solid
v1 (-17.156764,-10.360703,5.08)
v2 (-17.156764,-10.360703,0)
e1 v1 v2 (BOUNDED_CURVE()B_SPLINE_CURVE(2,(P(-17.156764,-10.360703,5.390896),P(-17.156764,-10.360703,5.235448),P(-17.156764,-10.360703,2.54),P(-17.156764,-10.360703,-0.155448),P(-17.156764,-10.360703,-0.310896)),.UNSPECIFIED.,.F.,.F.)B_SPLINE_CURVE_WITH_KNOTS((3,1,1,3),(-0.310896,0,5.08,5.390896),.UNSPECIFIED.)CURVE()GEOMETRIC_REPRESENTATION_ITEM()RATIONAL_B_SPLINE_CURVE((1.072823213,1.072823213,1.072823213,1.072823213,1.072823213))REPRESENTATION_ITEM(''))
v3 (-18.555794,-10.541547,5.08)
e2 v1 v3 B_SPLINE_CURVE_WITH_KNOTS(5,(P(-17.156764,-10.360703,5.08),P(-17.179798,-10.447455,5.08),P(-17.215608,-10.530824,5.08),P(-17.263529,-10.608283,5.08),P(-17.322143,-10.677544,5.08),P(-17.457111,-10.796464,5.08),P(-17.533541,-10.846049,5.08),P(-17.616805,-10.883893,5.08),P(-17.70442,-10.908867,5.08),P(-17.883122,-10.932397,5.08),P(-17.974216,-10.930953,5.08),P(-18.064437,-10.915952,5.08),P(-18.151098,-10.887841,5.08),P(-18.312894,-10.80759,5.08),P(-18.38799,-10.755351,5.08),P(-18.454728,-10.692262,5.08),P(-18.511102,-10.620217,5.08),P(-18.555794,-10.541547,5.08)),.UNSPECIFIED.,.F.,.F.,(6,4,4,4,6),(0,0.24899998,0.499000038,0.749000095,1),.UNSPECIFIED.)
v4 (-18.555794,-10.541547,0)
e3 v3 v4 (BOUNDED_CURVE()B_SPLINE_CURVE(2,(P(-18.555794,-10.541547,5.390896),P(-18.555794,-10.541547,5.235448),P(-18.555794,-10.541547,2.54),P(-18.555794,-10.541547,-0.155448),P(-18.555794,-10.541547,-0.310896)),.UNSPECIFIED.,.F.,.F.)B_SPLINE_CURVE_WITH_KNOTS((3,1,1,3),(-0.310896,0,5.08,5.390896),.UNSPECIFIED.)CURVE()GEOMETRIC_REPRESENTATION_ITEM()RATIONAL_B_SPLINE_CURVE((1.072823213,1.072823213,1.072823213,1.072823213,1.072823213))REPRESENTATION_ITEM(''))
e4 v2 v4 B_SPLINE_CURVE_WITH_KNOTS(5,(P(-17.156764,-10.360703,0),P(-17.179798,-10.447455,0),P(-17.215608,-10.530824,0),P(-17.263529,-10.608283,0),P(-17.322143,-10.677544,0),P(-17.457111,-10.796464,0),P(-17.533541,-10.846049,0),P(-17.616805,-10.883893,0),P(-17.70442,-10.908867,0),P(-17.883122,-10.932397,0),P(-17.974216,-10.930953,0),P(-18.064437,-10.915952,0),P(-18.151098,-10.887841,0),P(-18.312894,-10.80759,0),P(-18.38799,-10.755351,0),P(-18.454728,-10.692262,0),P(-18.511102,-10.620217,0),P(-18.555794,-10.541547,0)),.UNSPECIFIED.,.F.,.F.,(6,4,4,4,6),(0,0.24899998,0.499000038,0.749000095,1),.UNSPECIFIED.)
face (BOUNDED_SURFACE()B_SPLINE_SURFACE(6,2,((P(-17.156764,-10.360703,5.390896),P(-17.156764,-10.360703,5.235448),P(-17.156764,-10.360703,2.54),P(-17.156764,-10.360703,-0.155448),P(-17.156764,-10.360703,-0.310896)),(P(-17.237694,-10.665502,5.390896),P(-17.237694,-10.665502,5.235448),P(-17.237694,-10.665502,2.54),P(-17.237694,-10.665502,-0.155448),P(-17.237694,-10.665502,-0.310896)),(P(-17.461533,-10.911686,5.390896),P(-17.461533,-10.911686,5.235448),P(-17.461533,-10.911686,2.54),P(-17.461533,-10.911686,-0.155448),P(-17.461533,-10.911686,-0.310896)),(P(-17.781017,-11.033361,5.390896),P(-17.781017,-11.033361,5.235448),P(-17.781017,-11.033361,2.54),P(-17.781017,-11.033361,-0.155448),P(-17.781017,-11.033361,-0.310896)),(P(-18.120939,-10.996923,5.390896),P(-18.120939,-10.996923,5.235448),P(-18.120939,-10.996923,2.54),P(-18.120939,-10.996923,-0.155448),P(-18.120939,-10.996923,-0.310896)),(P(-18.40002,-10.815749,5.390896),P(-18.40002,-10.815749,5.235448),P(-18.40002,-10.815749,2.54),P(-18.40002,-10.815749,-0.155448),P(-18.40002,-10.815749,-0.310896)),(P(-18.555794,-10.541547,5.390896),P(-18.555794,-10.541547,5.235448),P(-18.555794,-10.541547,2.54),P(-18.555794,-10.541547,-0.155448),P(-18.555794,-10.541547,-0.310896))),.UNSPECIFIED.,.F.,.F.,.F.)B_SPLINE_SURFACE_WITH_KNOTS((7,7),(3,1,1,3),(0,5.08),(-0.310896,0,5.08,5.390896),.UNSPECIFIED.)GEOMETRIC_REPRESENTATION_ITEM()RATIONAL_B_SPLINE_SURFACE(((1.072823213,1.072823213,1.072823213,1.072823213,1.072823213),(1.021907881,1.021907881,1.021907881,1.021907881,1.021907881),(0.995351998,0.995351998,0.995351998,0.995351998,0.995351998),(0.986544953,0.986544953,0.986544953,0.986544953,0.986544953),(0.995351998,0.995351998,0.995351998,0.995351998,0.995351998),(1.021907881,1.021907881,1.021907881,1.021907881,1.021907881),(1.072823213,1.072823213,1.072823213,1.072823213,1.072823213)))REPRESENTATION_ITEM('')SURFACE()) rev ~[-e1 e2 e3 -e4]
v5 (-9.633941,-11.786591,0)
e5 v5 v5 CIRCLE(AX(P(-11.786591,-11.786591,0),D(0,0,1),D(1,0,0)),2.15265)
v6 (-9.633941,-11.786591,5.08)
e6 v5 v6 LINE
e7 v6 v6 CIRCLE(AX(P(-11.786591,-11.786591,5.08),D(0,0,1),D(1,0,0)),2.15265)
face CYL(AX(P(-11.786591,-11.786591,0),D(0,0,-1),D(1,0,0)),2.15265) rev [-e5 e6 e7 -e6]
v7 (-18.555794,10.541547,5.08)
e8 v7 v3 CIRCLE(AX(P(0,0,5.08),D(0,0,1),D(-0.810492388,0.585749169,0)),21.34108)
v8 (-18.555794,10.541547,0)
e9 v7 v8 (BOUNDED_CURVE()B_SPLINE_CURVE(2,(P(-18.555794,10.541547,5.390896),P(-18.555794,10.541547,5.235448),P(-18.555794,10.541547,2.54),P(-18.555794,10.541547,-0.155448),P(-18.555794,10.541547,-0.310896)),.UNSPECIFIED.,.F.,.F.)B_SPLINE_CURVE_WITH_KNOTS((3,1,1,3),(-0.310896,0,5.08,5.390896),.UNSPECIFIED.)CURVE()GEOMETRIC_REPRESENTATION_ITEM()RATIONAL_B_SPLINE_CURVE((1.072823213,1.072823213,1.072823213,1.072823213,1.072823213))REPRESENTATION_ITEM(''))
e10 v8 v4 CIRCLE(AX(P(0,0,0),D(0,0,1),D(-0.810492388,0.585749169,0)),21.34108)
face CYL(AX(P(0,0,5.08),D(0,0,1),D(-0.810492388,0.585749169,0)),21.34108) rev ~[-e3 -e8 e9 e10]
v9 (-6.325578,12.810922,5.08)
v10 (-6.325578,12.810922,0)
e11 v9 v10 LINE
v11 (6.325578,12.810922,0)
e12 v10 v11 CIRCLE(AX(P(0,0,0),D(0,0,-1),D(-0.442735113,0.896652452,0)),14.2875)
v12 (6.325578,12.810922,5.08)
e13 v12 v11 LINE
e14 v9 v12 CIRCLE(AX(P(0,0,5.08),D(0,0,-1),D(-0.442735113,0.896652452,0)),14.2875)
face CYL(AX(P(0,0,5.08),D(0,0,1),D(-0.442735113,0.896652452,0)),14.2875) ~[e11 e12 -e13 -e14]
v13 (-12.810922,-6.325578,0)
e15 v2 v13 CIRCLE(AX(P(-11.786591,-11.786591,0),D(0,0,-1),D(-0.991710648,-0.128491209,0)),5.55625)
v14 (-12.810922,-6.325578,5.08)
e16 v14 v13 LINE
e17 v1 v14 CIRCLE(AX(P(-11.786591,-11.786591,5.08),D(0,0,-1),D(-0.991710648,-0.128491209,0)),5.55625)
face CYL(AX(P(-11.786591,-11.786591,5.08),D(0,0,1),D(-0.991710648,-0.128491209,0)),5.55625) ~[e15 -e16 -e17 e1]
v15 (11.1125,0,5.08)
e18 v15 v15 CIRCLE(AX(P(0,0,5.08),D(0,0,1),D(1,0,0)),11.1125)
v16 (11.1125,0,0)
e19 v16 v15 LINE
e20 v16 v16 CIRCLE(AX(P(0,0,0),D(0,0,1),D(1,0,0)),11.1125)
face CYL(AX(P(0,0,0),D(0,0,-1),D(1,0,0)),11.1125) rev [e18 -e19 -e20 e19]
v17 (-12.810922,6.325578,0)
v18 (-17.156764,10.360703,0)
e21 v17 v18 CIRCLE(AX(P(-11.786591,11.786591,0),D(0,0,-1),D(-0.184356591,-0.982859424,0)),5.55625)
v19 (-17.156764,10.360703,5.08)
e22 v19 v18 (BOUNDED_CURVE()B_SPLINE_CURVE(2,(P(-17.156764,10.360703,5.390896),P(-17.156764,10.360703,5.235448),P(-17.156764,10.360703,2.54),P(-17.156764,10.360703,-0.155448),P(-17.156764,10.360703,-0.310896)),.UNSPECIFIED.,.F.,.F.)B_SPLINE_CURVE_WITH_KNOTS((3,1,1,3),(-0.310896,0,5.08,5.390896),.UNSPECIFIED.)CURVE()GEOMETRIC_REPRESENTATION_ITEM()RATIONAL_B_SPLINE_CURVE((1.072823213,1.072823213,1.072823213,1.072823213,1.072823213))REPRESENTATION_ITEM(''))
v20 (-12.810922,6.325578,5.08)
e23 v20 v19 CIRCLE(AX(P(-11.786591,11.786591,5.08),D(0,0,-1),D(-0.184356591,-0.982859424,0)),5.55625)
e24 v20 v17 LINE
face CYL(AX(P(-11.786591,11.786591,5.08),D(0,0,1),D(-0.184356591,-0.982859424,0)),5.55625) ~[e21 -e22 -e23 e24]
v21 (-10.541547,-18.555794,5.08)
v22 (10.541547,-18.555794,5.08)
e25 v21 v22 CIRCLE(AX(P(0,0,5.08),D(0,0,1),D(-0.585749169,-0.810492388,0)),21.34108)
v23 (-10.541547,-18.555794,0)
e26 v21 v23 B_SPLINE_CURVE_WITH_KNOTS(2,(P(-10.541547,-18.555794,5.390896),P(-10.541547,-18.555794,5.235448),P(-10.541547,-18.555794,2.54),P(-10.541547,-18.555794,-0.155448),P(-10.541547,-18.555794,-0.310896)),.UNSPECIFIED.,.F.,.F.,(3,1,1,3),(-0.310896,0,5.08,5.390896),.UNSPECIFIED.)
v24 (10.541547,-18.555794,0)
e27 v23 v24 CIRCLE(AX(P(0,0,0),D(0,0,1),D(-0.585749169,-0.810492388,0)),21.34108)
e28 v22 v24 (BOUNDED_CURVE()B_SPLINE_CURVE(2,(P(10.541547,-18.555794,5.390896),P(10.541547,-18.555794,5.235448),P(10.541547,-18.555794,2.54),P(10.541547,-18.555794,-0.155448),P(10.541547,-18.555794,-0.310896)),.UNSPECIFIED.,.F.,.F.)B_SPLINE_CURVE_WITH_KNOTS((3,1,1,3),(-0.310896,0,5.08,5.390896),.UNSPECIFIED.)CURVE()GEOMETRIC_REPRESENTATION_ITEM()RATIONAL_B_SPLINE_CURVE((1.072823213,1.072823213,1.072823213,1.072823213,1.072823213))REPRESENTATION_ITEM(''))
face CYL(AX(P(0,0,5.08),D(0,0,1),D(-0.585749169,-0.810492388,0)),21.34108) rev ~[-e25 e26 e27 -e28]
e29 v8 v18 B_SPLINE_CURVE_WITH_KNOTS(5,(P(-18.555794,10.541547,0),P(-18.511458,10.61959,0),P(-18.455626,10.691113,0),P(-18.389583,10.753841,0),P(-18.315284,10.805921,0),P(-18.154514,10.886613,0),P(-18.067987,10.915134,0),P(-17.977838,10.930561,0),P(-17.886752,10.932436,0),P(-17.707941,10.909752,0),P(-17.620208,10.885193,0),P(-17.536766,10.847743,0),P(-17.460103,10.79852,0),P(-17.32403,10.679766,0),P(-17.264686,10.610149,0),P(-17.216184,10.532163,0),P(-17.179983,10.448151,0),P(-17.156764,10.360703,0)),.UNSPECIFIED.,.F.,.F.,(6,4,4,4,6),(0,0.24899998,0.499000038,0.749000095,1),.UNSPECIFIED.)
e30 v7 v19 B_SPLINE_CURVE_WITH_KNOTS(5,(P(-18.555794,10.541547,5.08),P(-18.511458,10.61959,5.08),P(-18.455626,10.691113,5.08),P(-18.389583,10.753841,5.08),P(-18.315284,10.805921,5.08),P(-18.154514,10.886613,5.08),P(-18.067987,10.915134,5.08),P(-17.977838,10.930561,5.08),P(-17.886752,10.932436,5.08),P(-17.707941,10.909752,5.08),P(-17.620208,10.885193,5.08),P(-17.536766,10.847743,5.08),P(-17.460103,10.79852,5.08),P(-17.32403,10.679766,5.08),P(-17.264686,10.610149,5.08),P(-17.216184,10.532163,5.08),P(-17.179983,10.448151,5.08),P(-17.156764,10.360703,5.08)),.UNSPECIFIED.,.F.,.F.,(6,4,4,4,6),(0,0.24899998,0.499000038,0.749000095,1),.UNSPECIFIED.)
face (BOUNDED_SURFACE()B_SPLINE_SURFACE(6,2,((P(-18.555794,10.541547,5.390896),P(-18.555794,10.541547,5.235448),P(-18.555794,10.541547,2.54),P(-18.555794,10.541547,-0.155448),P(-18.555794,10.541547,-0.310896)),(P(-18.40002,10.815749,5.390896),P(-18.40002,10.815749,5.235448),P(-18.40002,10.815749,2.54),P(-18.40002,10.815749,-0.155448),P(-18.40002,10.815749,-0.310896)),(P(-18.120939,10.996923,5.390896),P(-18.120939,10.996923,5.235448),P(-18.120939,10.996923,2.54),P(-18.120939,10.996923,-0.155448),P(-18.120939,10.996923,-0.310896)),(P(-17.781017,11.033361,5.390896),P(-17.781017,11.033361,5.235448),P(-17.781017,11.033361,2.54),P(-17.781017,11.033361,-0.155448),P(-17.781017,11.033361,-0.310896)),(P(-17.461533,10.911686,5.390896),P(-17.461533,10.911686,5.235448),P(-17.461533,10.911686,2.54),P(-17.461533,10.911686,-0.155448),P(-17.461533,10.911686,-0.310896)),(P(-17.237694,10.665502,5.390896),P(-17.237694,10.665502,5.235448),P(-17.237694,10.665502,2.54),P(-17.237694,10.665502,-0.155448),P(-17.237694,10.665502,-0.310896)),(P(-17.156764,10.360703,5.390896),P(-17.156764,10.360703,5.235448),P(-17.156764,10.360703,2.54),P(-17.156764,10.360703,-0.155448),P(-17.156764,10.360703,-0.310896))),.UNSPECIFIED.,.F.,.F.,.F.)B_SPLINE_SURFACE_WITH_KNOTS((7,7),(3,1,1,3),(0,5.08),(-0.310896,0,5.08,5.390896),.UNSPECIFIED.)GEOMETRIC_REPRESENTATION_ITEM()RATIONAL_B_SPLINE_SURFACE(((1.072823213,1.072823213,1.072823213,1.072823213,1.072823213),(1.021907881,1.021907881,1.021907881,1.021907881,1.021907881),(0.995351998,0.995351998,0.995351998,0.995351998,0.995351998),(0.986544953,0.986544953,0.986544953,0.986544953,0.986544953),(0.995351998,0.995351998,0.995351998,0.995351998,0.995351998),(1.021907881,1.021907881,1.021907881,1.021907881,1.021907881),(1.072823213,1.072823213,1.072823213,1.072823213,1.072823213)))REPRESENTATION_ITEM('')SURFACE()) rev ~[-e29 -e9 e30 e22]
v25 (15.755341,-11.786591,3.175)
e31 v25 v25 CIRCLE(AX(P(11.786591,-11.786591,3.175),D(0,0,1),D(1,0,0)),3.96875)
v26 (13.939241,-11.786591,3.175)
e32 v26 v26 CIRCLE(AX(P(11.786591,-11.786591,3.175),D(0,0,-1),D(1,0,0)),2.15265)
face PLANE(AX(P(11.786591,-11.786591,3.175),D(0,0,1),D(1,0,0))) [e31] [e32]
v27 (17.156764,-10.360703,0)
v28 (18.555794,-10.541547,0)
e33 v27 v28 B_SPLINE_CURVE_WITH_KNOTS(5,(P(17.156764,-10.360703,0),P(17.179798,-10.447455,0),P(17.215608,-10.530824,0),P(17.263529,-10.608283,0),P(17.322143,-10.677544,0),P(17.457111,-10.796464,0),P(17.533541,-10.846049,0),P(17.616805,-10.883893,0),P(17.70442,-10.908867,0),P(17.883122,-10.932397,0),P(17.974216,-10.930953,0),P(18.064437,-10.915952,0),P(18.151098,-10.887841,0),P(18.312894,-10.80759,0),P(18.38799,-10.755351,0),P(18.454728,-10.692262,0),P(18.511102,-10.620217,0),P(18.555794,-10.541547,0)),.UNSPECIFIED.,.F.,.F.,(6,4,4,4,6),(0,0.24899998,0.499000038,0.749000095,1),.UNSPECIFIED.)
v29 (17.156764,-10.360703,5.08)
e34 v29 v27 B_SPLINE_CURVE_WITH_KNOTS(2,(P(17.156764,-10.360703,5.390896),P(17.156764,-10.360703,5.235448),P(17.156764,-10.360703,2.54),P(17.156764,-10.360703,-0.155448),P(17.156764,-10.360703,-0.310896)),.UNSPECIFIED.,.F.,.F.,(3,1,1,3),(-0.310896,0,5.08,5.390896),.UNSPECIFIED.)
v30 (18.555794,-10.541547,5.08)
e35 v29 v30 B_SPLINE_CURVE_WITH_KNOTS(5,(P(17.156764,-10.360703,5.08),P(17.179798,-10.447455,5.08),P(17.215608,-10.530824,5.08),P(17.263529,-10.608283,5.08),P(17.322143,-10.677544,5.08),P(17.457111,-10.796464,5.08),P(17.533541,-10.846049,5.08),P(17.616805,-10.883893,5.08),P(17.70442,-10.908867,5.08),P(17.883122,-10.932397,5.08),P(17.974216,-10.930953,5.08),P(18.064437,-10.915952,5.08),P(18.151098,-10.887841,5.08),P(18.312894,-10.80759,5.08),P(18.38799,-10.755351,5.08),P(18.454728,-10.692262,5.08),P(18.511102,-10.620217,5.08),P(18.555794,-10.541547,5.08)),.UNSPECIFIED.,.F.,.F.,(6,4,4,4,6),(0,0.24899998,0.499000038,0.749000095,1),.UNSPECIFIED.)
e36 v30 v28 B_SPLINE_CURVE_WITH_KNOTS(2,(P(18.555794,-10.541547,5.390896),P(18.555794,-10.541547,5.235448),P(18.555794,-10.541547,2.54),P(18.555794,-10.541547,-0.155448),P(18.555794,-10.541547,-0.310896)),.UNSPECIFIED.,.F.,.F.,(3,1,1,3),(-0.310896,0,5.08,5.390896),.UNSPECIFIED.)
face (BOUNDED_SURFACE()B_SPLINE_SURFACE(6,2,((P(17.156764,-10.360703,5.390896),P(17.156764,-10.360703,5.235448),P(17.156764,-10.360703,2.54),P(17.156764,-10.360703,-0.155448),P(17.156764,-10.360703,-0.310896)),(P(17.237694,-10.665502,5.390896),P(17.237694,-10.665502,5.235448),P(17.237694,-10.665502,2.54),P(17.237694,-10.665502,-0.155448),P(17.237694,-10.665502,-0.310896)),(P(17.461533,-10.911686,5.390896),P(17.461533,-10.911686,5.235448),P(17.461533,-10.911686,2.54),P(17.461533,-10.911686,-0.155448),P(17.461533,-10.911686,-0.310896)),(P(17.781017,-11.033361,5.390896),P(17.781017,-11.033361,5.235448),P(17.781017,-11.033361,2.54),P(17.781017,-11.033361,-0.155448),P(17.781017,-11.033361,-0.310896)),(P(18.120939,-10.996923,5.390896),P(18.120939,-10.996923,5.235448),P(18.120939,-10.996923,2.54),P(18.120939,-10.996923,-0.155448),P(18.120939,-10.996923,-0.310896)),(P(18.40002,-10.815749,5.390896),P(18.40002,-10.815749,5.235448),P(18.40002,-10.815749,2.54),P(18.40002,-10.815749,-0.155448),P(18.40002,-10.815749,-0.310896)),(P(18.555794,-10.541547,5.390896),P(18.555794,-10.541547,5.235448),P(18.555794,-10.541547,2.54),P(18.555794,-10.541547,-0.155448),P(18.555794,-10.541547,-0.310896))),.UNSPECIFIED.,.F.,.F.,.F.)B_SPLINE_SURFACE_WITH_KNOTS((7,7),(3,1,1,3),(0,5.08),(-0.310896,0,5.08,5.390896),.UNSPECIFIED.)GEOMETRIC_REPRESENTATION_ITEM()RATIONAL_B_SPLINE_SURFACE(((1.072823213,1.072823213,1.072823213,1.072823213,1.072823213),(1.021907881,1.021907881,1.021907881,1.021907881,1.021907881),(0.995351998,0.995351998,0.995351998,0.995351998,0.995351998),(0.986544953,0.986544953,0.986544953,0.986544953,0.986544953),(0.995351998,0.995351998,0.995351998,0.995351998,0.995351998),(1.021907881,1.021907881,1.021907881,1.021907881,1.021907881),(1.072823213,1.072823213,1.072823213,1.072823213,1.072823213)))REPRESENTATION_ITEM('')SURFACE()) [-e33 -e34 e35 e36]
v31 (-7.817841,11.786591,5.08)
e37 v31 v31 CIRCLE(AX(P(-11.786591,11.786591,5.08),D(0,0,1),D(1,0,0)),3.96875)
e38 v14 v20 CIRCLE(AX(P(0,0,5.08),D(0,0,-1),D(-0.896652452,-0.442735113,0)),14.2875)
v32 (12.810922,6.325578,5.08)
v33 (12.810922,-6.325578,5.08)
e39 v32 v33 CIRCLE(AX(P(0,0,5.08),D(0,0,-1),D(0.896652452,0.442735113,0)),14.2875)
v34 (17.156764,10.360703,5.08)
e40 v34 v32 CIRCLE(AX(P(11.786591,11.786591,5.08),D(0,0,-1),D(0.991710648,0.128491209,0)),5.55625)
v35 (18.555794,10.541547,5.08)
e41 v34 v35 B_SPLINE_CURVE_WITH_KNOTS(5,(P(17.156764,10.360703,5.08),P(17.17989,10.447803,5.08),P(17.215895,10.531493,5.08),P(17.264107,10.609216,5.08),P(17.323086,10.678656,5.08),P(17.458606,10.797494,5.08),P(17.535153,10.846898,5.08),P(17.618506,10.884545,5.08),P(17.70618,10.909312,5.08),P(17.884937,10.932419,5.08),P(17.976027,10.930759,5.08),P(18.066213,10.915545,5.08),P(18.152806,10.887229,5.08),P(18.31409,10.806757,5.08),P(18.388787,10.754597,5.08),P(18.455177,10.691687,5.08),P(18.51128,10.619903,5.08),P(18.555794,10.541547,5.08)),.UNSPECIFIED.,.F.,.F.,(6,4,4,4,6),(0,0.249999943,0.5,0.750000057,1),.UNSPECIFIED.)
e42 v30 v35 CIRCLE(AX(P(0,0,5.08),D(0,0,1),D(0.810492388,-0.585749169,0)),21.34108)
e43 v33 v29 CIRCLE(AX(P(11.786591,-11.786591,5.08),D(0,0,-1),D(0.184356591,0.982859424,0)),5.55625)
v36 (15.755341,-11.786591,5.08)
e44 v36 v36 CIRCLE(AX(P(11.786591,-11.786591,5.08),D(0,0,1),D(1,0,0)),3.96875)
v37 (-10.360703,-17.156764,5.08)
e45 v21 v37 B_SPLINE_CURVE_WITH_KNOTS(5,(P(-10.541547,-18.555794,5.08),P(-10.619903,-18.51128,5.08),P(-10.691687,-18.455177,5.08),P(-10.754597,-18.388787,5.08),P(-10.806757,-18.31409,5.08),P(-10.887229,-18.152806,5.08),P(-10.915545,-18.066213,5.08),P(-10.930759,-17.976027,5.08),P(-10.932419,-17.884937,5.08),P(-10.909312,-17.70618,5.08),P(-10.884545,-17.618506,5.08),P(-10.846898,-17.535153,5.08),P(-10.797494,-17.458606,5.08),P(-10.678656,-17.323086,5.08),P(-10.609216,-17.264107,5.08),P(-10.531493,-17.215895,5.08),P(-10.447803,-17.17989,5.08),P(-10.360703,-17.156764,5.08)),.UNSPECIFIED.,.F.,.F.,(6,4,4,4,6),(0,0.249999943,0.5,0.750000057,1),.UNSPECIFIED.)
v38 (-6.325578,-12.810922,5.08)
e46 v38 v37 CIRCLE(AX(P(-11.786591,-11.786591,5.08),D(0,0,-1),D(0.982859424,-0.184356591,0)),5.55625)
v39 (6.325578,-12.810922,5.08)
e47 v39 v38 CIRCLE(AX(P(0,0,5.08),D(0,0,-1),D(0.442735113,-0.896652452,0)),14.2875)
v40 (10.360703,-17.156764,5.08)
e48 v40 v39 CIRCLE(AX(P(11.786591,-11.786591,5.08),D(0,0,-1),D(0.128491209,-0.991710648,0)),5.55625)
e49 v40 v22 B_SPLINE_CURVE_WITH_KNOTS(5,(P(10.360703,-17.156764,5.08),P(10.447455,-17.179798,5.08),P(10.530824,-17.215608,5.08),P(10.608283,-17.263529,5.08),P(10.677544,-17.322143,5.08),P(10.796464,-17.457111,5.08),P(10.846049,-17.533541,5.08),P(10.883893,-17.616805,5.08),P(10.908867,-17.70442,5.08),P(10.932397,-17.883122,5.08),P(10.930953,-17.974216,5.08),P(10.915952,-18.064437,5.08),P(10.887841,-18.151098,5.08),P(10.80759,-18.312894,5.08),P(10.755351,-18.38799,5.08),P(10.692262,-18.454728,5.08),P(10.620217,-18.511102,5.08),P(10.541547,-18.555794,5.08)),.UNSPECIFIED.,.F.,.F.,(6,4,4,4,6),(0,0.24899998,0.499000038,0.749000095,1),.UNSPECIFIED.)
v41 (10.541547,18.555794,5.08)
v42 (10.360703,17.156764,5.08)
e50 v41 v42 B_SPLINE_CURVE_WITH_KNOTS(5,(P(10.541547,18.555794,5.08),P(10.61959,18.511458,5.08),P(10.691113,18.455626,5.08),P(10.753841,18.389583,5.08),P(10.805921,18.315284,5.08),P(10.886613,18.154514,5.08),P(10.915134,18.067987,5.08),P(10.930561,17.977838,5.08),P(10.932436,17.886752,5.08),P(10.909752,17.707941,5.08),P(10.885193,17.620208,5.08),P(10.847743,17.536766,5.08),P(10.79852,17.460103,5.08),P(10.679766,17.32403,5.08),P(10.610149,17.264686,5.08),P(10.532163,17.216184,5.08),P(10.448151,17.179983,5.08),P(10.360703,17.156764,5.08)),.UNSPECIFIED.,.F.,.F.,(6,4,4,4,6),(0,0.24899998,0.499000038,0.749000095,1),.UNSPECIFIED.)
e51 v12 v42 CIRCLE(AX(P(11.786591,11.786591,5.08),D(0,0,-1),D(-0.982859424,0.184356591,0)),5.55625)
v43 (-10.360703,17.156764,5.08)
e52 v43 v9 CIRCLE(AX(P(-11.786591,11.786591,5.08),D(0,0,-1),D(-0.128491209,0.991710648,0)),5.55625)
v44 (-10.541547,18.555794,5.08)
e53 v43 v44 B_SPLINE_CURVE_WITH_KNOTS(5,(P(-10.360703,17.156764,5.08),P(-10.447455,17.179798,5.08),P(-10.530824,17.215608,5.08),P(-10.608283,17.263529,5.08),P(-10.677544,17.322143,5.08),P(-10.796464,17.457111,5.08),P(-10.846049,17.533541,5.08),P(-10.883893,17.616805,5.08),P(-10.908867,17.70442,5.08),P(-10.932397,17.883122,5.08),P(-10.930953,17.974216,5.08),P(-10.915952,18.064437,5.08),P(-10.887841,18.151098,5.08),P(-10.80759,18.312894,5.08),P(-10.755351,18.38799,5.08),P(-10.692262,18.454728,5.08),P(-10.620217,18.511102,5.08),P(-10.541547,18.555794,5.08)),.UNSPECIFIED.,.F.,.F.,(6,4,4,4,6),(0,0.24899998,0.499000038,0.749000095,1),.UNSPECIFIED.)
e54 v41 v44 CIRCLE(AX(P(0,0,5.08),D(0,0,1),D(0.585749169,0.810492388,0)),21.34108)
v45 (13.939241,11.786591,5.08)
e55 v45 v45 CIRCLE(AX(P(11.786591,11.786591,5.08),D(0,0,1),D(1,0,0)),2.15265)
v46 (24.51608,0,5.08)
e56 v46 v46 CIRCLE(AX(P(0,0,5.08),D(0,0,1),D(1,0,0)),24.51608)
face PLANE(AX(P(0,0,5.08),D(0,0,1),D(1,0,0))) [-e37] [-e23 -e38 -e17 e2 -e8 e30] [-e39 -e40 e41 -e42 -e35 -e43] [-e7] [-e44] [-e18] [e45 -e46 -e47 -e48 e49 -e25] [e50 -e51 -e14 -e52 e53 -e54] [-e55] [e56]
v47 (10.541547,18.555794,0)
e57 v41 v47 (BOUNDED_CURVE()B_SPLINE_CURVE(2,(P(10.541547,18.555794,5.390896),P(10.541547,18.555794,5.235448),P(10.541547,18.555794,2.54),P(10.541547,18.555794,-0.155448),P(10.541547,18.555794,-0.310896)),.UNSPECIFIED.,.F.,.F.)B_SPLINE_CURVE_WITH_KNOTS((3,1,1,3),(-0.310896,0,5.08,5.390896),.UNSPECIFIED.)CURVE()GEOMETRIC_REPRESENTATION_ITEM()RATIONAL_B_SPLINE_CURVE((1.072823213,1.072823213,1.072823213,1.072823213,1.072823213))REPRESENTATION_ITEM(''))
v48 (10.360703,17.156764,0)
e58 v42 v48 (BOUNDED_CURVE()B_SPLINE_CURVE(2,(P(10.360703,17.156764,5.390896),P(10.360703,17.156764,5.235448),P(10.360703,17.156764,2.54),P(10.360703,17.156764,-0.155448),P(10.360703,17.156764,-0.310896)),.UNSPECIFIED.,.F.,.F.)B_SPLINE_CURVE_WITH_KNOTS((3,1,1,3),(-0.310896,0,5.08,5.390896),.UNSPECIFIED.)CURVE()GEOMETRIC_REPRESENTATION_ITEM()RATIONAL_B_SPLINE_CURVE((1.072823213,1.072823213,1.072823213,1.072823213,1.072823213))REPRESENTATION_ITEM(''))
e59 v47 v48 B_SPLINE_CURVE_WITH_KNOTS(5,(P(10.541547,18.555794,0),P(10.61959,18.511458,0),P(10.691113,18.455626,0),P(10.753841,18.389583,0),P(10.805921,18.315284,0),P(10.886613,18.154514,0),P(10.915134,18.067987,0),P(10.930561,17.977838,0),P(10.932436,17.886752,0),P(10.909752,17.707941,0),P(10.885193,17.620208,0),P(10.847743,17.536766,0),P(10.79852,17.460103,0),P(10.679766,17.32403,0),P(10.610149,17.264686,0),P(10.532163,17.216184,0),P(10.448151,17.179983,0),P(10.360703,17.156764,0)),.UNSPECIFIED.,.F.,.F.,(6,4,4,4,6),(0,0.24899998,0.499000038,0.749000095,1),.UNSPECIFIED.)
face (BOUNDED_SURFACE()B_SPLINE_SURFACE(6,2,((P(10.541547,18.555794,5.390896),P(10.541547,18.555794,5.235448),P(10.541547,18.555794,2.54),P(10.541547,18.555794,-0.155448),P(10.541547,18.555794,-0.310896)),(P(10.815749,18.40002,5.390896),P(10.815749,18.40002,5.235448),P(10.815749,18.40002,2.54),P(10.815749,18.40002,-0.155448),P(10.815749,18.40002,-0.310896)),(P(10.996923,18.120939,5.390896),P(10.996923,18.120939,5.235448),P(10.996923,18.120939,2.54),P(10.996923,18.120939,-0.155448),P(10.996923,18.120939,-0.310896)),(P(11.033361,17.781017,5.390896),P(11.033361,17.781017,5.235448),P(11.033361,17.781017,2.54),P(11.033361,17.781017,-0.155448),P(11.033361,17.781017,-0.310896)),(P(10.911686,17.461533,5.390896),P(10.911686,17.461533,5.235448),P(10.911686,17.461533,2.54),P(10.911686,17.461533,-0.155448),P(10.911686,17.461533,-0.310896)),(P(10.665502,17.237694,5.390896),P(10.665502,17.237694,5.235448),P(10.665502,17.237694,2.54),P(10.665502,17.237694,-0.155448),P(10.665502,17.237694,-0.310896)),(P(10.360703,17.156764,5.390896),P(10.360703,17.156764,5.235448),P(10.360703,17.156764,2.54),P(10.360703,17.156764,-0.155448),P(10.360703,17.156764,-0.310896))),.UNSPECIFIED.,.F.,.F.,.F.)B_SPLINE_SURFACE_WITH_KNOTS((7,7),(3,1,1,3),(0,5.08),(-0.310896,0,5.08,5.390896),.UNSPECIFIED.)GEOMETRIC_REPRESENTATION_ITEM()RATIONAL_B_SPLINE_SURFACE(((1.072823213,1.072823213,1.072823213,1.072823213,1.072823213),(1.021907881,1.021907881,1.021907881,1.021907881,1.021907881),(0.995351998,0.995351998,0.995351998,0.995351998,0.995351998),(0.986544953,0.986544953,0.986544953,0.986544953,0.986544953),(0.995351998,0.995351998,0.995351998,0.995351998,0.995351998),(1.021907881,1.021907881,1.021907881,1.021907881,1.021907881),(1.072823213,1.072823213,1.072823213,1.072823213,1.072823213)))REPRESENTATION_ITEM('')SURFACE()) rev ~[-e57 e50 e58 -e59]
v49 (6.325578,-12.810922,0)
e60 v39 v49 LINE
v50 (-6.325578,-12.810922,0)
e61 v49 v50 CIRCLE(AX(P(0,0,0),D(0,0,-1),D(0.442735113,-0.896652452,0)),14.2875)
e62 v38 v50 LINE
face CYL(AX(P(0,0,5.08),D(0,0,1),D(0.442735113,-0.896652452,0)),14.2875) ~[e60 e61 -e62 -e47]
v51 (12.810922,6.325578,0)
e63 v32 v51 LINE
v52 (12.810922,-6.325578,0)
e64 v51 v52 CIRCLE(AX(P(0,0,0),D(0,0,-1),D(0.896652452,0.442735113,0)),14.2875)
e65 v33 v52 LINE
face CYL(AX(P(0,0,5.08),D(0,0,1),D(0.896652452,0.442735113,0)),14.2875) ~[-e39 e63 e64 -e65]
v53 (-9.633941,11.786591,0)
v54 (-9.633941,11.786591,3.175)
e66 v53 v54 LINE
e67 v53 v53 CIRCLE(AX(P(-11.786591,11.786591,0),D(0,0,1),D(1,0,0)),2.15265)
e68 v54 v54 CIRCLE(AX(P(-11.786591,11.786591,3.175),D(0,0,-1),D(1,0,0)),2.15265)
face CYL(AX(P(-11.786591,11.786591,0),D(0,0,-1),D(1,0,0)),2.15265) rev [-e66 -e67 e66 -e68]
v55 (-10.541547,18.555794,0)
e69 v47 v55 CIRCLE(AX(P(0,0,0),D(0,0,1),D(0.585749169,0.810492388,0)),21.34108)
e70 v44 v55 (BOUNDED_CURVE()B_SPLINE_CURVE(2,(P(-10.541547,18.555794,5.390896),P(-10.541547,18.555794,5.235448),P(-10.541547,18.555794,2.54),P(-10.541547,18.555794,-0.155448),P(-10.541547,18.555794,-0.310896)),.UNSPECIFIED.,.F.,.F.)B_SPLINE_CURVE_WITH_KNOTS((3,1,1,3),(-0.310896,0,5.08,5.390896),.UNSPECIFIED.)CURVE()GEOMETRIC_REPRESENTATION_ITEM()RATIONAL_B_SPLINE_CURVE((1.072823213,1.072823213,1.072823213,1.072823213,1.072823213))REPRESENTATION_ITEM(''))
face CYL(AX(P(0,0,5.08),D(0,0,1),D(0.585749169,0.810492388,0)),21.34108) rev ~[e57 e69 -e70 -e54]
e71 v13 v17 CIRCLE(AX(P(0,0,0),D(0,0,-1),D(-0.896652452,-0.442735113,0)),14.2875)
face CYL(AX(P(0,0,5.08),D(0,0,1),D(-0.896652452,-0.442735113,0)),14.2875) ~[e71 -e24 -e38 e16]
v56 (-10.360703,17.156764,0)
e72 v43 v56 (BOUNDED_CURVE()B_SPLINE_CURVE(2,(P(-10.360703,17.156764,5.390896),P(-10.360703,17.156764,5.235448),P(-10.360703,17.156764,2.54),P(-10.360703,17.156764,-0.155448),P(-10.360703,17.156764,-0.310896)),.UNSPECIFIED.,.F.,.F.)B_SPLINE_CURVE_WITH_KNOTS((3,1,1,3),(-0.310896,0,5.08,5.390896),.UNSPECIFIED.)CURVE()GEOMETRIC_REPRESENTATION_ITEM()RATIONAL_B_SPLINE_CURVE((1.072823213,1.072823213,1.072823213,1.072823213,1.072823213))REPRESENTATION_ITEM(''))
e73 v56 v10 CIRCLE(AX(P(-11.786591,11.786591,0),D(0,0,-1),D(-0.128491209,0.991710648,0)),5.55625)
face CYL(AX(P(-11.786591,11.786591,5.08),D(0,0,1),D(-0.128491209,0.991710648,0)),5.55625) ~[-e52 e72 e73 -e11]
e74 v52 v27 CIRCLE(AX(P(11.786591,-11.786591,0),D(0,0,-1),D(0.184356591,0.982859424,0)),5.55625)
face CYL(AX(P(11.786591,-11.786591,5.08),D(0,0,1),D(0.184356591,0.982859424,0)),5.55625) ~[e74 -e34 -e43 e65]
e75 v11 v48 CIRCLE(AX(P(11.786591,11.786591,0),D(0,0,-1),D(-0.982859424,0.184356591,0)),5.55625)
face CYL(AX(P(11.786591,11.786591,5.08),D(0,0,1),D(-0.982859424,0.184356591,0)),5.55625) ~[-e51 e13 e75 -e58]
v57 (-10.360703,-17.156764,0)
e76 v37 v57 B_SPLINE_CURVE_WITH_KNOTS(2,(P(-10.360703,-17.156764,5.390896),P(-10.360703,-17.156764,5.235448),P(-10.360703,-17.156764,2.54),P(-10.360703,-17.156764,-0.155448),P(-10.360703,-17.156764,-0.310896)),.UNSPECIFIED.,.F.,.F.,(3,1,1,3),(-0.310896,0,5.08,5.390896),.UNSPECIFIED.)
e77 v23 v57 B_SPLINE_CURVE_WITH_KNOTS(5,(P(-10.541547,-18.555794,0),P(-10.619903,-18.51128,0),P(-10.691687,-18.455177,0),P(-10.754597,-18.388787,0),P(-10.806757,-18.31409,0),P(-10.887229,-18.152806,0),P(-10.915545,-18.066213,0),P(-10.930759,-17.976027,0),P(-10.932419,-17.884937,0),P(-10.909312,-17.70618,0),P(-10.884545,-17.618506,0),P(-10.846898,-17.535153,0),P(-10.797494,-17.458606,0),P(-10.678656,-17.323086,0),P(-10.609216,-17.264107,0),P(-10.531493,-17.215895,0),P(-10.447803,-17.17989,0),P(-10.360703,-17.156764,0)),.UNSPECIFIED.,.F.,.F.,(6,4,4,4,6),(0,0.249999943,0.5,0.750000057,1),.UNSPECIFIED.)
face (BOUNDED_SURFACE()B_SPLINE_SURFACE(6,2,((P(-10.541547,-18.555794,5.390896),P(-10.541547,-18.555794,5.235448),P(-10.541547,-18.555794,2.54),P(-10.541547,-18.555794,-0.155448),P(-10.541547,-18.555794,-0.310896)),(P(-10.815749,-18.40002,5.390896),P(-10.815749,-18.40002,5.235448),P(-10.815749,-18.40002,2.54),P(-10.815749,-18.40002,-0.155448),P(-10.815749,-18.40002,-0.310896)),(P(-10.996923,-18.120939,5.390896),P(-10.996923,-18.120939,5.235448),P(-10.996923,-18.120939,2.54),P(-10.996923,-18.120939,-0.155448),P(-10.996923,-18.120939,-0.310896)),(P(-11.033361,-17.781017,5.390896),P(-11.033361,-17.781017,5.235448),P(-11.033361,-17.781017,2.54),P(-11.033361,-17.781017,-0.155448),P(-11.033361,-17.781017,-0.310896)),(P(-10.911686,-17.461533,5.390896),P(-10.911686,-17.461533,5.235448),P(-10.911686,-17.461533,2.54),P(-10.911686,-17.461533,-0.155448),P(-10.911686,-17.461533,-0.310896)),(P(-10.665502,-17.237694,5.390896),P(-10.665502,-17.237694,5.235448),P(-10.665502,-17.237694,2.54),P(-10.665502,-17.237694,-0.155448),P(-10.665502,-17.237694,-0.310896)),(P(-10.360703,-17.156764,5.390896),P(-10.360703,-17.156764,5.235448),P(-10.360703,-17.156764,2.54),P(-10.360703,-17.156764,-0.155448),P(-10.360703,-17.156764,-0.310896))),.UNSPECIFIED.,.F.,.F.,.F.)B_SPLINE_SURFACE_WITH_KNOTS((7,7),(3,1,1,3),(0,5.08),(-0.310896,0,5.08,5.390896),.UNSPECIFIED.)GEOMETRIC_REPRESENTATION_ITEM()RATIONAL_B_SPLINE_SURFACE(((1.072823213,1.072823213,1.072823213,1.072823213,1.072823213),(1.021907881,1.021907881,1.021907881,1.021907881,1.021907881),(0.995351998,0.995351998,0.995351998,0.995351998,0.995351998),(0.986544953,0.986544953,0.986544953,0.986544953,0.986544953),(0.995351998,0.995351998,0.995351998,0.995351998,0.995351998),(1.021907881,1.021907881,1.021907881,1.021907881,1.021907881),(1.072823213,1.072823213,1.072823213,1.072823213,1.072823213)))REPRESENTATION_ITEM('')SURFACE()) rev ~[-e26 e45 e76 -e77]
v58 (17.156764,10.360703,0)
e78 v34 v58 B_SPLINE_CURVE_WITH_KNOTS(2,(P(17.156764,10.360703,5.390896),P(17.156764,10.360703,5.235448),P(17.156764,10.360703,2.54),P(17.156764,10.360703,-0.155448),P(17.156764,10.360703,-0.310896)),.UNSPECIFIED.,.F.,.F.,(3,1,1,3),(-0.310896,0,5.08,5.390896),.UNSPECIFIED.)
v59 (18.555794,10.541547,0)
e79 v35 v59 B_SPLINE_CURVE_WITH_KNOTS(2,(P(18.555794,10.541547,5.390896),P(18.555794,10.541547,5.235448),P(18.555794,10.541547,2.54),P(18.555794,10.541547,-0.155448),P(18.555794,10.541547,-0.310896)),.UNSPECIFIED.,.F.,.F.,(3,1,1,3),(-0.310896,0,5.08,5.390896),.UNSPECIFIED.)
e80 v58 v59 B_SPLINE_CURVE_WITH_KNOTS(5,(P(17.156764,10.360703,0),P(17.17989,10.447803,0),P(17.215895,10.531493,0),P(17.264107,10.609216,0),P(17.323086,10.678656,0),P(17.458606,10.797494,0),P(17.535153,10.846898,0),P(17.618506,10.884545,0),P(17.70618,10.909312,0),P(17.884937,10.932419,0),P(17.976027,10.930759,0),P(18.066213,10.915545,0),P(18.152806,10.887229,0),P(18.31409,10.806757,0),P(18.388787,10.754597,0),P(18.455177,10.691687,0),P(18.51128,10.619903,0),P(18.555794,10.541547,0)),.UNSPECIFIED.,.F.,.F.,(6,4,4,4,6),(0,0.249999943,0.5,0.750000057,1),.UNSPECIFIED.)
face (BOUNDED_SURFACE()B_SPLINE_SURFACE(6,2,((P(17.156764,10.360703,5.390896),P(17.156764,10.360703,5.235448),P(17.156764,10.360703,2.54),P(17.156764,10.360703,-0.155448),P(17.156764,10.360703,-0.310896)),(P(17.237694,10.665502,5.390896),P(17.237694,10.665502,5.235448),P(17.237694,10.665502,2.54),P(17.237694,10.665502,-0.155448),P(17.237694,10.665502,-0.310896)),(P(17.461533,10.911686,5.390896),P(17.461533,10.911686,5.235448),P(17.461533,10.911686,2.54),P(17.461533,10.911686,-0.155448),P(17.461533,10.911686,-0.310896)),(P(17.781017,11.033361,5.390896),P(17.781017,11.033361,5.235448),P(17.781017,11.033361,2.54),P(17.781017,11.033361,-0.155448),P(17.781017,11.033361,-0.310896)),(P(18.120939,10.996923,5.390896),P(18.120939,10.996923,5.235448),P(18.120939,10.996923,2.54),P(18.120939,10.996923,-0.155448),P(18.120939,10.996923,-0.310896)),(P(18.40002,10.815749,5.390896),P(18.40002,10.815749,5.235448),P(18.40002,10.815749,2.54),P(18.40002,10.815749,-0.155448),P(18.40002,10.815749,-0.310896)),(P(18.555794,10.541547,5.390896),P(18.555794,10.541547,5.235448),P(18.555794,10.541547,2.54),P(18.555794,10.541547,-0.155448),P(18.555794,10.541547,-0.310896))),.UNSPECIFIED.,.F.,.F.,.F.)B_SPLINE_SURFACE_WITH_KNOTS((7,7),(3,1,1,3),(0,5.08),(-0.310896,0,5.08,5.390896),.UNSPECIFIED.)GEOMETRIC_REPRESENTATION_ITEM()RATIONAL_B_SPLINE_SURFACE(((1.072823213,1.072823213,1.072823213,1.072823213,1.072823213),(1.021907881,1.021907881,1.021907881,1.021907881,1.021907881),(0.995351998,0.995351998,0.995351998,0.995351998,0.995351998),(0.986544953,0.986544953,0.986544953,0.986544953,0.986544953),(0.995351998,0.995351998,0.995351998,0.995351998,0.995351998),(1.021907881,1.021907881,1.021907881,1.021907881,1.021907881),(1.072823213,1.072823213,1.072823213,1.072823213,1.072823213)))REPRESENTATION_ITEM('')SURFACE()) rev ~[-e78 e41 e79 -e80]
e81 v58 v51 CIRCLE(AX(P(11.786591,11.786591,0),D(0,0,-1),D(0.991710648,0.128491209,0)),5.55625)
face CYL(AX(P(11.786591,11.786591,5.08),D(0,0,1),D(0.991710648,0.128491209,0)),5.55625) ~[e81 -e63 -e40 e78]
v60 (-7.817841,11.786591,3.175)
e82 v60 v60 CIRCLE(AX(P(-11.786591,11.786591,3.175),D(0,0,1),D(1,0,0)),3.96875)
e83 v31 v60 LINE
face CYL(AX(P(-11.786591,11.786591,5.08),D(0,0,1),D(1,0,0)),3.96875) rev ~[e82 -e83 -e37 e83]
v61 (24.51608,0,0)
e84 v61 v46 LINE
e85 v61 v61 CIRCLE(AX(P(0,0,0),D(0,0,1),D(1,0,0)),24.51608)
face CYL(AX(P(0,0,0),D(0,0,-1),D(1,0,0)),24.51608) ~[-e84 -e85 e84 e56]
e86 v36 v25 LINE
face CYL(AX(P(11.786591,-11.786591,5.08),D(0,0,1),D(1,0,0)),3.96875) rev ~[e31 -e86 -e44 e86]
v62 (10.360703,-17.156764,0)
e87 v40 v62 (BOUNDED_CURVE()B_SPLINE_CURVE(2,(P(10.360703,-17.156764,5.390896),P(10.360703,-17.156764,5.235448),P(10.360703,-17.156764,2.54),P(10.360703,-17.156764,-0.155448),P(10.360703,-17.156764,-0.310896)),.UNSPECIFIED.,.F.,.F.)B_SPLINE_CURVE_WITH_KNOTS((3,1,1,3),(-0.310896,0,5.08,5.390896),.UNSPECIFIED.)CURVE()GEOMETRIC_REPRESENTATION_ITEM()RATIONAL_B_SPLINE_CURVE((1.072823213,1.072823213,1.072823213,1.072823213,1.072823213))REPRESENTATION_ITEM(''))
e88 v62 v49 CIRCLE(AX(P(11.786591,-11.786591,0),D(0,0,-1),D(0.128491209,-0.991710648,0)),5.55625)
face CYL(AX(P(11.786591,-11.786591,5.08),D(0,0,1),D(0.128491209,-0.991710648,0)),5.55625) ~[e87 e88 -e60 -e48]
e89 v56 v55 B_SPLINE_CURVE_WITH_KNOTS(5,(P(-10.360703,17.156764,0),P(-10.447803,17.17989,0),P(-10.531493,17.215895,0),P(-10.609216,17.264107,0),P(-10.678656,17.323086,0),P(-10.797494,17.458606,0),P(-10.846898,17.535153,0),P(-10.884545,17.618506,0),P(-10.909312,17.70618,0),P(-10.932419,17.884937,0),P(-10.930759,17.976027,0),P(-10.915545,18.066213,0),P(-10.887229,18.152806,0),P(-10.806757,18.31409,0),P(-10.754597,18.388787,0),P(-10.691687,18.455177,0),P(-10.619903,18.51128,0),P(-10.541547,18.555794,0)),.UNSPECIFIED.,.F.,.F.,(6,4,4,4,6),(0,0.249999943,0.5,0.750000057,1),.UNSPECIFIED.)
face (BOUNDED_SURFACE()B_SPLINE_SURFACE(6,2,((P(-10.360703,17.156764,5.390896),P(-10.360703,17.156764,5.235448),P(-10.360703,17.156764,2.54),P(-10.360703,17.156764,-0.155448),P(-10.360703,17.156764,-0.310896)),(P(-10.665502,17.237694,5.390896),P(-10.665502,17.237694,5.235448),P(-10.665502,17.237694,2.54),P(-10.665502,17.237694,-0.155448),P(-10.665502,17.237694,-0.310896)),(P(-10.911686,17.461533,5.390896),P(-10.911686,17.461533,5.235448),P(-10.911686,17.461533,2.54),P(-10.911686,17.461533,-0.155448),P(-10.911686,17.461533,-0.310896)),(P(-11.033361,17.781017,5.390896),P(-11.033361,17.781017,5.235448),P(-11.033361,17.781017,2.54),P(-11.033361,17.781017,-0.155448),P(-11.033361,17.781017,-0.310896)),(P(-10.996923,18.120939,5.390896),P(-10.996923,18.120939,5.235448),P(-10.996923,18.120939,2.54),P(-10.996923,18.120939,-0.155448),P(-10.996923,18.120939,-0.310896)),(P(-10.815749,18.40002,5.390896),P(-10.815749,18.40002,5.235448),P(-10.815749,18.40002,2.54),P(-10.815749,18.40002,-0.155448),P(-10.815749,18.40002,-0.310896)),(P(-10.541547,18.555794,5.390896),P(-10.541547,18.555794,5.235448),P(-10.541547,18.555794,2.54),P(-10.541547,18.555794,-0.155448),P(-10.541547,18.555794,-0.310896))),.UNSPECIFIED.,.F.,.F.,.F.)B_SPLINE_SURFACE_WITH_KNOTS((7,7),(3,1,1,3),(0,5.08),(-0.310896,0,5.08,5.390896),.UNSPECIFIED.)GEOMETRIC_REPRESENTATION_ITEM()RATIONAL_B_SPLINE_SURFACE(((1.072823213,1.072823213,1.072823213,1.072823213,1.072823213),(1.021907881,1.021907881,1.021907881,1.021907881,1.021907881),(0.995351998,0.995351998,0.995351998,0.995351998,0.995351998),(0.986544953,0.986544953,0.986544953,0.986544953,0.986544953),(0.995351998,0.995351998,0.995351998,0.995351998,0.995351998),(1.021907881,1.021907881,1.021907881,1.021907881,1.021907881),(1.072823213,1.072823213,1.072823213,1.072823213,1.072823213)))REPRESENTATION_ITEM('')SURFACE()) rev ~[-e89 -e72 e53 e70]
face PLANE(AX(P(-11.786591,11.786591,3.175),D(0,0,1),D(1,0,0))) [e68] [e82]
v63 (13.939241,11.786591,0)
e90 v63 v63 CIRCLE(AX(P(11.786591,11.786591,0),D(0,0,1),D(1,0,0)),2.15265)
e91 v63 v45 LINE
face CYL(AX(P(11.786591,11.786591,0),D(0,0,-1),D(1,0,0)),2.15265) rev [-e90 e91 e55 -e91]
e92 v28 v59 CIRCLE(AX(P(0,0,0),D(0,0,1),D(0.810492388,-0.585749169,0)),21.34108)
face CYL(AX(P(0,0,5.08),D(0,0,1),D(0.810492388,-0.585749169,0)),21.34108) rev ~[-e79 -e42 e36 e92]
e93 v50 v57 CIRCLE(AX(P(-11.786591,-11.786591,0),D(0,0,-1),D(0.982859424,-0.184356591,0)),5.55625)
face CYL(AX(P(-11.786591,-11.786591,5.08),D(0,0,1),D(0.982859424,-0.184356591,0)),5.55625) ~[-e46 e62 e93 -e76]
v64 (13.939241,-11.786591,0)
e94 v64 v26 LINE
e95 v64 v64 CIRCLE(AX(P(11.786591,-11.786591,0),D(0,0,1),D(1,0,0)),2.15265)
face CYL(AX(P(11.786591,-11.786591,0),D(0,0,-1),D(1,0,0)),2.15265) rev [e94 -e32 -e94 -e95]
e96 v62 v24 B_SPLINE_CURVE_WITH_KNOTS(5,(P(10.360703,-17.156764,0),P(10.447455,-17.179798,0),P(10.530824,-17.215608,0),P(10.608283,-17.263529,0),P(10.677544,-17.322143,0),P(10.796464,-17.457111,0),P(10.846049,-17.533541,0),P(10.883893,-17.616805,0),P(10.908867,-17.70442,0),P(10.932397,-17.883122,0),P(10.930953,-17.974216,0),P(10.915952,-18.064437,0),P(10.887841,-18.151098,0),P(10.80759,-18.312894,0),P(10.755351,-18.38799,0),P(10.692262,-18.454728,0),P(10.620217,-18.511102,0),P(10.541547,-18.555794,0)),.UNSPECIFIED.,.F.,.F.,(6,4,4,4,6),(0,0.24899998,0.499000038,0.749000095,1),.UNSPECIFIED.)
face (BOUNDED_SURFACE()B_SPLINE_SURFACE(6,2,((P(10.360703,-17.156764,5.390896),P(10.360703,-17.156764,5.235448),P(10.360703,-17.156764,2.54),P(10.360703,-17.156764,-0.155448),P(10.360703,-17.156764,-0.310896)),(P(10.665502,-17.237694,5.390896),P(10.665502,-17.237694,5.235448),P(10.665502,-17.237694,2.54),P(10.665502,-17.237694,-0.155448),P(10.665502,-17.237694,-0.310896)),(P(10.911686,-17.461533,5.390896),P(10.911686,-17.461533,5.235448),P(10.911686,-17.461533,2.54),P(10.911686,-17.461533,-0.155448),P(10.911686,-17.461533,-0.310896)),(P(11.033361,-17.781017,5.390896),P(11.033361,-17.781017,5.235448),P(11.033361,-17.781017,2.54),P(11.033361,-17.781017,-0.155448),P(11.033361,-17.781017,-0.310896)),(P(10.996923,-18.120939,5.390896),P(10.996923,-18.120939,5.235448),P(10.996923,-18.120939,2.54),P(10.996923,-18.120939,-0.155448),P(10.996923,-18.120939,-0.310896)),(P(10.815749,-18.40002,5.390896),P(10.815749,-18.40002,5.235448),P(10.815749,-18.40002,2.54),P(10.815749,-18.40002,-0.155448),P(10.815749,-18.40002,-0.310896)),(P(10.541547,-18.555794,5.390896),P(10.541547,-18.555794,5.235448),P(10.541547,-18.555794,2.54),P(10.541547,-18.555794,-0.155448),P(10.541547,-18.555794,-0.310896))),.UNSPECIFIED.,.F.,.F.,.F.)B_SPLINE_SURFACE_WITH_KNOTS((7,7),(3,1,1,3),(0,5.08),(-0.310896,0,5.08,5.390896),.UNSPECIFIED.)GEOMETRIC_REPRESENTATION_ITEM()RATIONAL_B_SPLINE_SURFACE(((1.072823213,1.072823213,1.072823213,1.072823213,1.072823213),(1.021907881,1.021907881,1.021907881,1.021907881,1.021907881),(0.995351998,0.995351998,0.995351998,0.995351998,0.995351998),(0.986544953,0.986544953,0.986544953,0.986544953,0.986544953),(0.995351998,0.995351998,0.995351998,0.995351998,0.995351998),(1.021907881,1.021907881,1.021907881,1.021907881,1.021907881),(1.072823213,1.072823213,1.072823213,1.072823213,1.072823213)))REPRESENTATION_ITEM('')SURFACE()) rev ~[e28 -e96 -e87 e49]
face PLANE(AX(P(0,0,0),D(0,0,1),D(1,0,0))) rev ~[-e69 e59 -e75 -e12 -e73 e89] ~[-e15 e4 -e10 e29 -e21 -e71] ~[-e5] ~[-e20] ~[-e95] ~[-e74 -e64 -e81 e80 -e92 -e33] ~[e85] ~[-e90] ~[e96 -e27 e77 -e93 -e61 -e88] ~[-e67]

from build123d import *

# Parameters (mm, degrees)
F0_R            = 24.51608
F0_R_2          = 2.15265
F0_R_3          = 11.1125
F1_DEPTH        = 5.08
F3_DEPTH        = 5.08
F3_COPIES_COUNT = 4
F4_R            = 0.762
F6_R            = 3.96875
F7_DEPTH        = 1.905


# Not quite as in the source:
# - a pattern or mirror of a feature is missing from the dataset's text; its kind, count and spacing are read off the source's solid


with BuildPart() as f1:
    # F0 (on Top) → F1 (new body)
    with BuildSketch(Plane.XY):
        Circle(F0_R)
        with Locations((-11.7865906, -11.7865906)):
            Circle(F0_R_2, mode=Mode.SUBTRACT)
        with Locations((11.7865906, -11.7865906)):
            Circle(F0_R_2, mode=Mode.SUBTRACT)
        with Locations((-11.7865906, 11.7865906)):
            Circle(F0_R_2, mode=Mode.SUBTRACT)
        Circle(F0_R_3, mode=Mode.SUBTRACT)
        with Locations((11.7865906, 11.7865906)):
            Circle(F0_R_2, mode=Mode.SUBTRACT)
    extrude(amount=F1_DEPTH)

    # F2 (on face) → F3 (cut, through all)
    with BuildSketch(Plane.XY.offset(5.08)):
        with BuildLine():
            ThreePointArc((-12.5005198818, 17.2967828873), (-8.5209455851, 16.2818633057), (-6.3255779254, 12.810921909))
            ThreePointArc((-6.3255779254, 12.810921909), (0, 14.2875), (6.3255779254, 12.810921909))
            ThreePointArc((6.3255779254, 12.810921909), (8.5209455851, 16.2818633057), (12.5005198818, 17.2967828873))
            ThreePointArc((12.5005198818, 17.2967828873), (0, 21.34108), (-12.5005198818, 17.2967828873))
        make_face()
    f3 = extrude(amount=-F3_DEPTH, mode=Mode.SUBTRACT)

    # F3_copies: F3 ×4 about axis
    f3_copies_axis = Axis((0, 0, 0), (0, 0, 1))
    for i in range(1, F3_COPIES_COUNT):
        add(f3.rotate(f3_copies_axis, i * 360 / F3_COPIES_COUNT), mode=Mode.SUBTRACT)

    # F4
    f4_edges = [f1.edges().sort_by_distance(p)[0] for p in [
        (-12.50052, 17.296783, 2.54),
        (12.50052, 17.296783, 2.54),
        (-17.296783, 12.50052, 2.54),
        (-17.296783, -12.50052, 2.54),
        (-12.50052, -17.296783, 2.54),
        (12.50052, -17.296783, 2.54),
        (17.296783, -12.50052, 2.54),
        (17.296783, 12.50052, 2.54),
    ]]
    fillet(f4_edges, radius=F4_R)

    # F6 (on face) → F7 (cut, through all)
    with BuildSketch(Plane.XY.offset(5.08)):
        with Locations((11.7865906, -11.7865906)):
            Circle(F6_R)
        with Locations((-11.7865906, 11.7865906)):
            Circle(F6_R)
    extrude(amount=-F7_DEPTH, mode=Mode.SUBTRACT)


solid = f1.part
